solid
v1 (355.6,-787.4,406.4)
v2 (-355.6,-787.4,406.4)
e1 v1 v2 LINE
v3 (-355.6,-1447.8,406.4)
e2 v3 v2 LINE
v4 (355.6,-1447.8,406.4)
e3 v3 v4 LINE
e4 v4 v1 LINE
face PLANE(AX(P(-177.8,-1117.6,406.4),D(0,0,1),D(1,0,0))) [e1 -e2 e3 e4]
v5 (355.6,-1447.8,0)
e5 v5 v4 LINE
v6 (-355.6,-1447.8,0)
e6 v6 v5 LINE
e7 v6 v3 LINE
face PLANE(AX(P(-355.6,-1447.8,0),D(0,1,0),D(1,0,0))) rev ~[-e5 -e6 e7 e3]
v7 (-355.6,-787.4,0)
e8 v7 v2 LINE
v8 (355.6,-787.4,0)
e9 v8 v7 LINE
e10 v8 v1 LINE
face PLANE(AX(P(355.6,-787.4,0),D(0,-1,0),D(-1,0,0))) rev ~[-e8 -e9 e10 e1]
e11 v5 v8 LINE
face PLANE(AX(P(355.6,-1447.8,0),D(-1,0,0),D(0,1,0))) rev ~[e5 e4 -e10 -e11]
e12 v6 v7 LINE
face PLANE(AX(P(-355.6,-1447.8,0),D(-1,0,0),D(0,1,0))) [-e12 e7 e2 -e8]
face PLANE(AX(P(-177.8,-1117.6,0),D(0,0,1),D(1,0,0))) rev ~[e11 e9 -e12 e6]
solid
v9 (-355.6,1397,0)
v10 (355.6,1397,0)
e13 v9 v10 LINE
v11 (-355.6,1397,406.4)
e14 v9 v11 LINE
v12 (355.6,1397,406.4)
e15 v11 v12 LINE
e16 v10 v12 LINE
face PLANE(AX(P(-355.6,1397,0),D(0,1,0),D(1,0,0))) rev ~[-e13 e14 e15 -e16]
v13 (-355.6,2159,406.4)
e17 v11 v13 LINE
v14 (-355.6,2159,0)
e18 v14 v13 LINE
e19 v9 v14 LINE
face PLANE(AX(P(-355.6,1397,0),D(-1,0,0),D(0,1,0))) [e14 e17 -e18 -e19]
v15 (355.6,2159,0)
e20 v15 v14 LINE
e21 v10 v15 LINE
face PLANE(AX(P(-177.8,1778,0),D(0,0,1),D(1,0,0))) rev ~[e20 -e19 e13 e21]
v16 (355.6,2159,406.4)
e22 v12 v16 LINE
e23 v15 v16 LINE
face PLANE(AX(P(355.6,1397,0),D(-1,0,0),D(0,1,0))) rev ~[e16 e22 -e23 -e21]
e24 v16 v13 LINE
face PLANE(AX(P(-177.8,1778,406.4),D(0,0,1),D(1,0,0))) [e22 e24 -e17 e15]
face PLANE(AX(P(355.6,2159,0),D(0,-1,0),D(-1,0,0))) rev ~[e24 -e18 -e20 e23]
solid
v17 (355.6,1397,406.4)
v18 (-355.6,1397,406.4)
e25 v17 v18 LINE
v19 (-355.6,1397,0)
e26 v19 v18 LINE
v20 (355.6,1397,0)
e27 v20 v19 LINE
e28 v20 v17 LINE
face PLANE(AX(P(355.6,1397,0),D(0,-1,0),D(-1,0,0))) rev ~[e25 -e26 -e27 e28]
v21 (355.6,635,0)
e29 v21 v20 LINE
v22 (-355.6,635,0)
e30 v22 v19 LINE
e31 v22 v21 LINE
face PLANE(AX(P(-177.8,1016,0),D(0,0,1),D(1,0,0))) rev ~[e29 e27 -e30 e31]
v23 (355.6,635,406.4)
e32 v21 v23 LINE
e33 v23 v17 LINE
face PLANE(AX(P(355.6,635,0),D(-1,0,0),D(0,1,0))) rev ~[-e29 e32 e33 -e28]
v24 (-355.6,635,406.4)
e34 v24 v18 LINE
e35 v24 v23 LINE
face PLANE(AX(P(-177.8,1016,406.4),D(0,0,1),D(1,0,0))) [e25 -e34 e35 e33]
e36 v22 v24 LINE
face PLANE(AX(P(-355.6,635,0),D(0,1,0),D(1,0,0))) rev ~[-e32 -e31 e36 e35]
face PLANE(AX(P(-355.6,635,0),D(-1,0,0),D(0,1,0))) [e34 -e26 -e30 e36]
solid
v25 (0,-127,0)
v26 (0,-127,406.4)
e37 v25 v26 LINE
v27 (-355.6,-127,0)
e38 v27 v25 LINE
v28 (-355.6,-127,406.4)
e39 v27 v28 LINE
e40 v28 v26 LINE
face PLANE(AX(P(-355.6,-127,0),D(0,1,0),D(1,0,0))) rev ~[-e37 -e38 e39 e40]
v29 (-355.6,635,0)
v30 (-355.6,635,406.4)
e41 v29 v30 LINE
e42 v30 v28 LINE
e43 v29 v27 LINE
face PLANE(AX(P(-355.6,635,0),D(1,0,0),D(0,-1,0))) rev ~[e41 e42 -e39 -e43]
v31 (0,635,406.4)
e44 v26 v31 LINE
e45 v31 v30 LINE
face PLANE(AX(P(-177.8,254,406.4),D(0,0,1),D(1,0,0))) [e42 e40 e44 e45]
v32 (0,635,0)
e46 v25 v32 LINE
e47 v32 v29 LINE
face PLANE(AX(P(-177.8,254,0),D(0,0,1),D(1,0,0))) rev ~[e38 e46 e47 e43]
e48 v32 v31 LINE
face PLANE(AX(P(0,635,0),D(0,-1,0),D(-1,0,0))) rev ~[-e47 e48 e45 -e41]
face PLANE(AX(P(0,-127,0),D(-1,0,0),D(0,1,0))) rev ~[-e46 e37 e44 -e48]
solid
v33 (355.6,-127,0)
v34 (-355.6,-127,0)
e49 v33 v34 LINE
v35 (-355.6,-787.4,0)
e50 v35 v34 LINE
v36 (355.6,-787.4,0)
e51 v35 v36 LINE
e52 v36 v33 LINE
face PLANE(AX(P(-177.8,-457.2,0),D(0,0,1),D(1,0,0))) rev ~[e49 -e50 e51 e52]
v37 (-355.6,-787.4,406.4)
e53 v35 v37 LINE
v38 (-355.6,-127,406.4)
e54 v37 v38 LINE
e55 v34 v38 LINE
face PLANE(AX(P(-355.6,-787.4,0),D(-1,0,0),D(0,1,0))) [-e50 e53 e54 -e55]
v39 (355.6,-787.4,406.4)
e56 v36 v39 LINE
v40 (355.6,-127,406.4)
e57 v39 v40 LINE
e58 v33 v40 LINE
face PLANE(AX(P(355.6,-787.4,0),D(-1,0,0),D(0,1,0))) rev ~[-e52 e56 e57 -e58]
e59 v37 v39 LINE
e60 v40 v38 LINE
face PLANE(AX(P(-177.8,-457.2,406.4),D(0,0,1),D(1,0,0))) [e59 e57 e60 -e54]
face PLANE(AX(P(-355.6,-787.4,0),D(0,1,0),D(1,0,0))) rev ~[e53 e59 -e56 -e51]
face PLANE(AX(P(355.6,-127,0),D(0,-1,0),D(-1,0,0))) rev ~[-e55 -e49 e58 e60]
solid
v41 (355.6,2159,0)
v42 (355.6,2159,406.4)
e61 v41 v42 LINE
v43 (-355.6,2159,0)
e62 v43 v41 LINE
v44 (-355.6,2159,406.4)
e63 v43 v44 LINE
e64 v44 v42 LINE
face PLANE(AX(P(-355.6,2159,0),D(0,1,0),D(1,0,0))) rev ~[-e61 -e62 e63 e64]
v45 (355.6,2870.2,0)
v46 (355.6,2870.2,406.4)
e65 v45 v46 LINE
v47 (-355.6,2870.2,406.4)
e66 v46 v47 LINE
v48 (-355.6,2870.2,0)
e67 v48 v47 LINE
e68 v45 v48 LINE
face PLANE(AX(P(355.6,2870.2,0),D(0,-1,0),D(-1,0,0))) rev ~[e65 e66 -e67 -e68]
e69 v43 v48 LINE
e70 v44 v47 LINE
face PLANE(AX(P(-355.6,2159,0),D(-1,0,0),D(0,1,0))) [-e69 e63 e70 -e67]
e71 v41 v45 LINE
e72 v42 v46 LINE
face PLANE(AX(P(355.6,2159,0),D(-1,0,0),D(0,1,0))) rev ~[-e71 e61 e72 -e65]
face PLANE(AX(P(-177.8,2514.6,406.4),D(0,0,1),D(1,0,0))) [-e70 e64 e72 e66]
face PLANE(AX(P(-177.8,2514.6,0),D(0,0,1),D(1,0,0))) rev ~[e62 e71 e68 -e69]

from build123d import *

# Parameters (mm, degrees)
F0_W     = 355.6
F0_H     = 660.4
F1_DEPTH = 406.4
F2_DEPTH = 406.4
F3_DEPTH = 406.4
F0_H_2   = 762
F4_DEPTH = 406.4
F5_DEPTH = 406.4
F0_H_3   = 711.2
F6_DEPTH = 406.4


# Not quite as in the source:
# - the program builds the solid bodies; features that only make, move or delete a surface that nothing else refers to are left out


with BuildPart() as f1:
    # F0 (on Top) → F1 (new body)
    with BuildSketch(Plane.XY):
        with Locations((-177.8, -1117.6)):
            Rectangle(F0_W, F0_H)
        with Locations((177.8, -1117.6)):
            Rectangle(F0_W, F0_H)
    extrude(amount=F1_DEPTH)


with BuildPart() as f2:
    # F0 (on Top) → F2 (new body)
    with BuildSketch(Plane.XY):
        with Locations((-177.8, -457.2)):
            Rectangle(F0_W, F0_H)
        with Locations((177.8, -457.2)):
            Rectangle(F0_W, F0_H)
    extrude(amount=F2_DEPTH)


with BuildPart() as f3:
    # F0 (on Top) → F3 (new body)
    with BuildSketch(Plane.XY):
        Polygon((0, 635), (-355.6, 635), (-355.6, 0), (-355.6, -127), (0, -127), align=None)
    extrude(amount=F3_DEPTH)


with BuildPart() as f4:
    # F0 (on Top) → F4 (new body)
    with BuildSketch(Plane.XY):
        with Locations((-177.8, 1016)):
            Rectangle(F0_W, F0_H_2)
        with Locations((177.8, 1016)):
            Rectangle(F0_W, F0_H_2)
    extrude(amount=F4_DEPTH)


with BuildPart() as f5:
    # F0 (on Top) → F5 (new body)
    with BuildSketch(Plane.XY):
        with Locations((-177.8, 1778)):
            Rectangle(F0_W, F0_H_2)
        with Locations((177.8, 1778)):
            Rectangle(F0_W, F0_H_2)
    extrude(amount=F5_DEPTH)


with BuildPart() as f6:
    # F0 (on Top) → F6 (new body)
    with BuildSketch(Plane.XY):
        with Locations((-177.8, 2514.6)):
            Rectangle(F0_W, F0_H_3)
        with Locations((177.8, 2514.6)):
            Rectangle(F0_W, F0_H_3)
    extrude(amount=F6_DEPTH)


solid = Compound([f1.part, f2.part, f3.part, f4.part, f5.part, f6.part])
